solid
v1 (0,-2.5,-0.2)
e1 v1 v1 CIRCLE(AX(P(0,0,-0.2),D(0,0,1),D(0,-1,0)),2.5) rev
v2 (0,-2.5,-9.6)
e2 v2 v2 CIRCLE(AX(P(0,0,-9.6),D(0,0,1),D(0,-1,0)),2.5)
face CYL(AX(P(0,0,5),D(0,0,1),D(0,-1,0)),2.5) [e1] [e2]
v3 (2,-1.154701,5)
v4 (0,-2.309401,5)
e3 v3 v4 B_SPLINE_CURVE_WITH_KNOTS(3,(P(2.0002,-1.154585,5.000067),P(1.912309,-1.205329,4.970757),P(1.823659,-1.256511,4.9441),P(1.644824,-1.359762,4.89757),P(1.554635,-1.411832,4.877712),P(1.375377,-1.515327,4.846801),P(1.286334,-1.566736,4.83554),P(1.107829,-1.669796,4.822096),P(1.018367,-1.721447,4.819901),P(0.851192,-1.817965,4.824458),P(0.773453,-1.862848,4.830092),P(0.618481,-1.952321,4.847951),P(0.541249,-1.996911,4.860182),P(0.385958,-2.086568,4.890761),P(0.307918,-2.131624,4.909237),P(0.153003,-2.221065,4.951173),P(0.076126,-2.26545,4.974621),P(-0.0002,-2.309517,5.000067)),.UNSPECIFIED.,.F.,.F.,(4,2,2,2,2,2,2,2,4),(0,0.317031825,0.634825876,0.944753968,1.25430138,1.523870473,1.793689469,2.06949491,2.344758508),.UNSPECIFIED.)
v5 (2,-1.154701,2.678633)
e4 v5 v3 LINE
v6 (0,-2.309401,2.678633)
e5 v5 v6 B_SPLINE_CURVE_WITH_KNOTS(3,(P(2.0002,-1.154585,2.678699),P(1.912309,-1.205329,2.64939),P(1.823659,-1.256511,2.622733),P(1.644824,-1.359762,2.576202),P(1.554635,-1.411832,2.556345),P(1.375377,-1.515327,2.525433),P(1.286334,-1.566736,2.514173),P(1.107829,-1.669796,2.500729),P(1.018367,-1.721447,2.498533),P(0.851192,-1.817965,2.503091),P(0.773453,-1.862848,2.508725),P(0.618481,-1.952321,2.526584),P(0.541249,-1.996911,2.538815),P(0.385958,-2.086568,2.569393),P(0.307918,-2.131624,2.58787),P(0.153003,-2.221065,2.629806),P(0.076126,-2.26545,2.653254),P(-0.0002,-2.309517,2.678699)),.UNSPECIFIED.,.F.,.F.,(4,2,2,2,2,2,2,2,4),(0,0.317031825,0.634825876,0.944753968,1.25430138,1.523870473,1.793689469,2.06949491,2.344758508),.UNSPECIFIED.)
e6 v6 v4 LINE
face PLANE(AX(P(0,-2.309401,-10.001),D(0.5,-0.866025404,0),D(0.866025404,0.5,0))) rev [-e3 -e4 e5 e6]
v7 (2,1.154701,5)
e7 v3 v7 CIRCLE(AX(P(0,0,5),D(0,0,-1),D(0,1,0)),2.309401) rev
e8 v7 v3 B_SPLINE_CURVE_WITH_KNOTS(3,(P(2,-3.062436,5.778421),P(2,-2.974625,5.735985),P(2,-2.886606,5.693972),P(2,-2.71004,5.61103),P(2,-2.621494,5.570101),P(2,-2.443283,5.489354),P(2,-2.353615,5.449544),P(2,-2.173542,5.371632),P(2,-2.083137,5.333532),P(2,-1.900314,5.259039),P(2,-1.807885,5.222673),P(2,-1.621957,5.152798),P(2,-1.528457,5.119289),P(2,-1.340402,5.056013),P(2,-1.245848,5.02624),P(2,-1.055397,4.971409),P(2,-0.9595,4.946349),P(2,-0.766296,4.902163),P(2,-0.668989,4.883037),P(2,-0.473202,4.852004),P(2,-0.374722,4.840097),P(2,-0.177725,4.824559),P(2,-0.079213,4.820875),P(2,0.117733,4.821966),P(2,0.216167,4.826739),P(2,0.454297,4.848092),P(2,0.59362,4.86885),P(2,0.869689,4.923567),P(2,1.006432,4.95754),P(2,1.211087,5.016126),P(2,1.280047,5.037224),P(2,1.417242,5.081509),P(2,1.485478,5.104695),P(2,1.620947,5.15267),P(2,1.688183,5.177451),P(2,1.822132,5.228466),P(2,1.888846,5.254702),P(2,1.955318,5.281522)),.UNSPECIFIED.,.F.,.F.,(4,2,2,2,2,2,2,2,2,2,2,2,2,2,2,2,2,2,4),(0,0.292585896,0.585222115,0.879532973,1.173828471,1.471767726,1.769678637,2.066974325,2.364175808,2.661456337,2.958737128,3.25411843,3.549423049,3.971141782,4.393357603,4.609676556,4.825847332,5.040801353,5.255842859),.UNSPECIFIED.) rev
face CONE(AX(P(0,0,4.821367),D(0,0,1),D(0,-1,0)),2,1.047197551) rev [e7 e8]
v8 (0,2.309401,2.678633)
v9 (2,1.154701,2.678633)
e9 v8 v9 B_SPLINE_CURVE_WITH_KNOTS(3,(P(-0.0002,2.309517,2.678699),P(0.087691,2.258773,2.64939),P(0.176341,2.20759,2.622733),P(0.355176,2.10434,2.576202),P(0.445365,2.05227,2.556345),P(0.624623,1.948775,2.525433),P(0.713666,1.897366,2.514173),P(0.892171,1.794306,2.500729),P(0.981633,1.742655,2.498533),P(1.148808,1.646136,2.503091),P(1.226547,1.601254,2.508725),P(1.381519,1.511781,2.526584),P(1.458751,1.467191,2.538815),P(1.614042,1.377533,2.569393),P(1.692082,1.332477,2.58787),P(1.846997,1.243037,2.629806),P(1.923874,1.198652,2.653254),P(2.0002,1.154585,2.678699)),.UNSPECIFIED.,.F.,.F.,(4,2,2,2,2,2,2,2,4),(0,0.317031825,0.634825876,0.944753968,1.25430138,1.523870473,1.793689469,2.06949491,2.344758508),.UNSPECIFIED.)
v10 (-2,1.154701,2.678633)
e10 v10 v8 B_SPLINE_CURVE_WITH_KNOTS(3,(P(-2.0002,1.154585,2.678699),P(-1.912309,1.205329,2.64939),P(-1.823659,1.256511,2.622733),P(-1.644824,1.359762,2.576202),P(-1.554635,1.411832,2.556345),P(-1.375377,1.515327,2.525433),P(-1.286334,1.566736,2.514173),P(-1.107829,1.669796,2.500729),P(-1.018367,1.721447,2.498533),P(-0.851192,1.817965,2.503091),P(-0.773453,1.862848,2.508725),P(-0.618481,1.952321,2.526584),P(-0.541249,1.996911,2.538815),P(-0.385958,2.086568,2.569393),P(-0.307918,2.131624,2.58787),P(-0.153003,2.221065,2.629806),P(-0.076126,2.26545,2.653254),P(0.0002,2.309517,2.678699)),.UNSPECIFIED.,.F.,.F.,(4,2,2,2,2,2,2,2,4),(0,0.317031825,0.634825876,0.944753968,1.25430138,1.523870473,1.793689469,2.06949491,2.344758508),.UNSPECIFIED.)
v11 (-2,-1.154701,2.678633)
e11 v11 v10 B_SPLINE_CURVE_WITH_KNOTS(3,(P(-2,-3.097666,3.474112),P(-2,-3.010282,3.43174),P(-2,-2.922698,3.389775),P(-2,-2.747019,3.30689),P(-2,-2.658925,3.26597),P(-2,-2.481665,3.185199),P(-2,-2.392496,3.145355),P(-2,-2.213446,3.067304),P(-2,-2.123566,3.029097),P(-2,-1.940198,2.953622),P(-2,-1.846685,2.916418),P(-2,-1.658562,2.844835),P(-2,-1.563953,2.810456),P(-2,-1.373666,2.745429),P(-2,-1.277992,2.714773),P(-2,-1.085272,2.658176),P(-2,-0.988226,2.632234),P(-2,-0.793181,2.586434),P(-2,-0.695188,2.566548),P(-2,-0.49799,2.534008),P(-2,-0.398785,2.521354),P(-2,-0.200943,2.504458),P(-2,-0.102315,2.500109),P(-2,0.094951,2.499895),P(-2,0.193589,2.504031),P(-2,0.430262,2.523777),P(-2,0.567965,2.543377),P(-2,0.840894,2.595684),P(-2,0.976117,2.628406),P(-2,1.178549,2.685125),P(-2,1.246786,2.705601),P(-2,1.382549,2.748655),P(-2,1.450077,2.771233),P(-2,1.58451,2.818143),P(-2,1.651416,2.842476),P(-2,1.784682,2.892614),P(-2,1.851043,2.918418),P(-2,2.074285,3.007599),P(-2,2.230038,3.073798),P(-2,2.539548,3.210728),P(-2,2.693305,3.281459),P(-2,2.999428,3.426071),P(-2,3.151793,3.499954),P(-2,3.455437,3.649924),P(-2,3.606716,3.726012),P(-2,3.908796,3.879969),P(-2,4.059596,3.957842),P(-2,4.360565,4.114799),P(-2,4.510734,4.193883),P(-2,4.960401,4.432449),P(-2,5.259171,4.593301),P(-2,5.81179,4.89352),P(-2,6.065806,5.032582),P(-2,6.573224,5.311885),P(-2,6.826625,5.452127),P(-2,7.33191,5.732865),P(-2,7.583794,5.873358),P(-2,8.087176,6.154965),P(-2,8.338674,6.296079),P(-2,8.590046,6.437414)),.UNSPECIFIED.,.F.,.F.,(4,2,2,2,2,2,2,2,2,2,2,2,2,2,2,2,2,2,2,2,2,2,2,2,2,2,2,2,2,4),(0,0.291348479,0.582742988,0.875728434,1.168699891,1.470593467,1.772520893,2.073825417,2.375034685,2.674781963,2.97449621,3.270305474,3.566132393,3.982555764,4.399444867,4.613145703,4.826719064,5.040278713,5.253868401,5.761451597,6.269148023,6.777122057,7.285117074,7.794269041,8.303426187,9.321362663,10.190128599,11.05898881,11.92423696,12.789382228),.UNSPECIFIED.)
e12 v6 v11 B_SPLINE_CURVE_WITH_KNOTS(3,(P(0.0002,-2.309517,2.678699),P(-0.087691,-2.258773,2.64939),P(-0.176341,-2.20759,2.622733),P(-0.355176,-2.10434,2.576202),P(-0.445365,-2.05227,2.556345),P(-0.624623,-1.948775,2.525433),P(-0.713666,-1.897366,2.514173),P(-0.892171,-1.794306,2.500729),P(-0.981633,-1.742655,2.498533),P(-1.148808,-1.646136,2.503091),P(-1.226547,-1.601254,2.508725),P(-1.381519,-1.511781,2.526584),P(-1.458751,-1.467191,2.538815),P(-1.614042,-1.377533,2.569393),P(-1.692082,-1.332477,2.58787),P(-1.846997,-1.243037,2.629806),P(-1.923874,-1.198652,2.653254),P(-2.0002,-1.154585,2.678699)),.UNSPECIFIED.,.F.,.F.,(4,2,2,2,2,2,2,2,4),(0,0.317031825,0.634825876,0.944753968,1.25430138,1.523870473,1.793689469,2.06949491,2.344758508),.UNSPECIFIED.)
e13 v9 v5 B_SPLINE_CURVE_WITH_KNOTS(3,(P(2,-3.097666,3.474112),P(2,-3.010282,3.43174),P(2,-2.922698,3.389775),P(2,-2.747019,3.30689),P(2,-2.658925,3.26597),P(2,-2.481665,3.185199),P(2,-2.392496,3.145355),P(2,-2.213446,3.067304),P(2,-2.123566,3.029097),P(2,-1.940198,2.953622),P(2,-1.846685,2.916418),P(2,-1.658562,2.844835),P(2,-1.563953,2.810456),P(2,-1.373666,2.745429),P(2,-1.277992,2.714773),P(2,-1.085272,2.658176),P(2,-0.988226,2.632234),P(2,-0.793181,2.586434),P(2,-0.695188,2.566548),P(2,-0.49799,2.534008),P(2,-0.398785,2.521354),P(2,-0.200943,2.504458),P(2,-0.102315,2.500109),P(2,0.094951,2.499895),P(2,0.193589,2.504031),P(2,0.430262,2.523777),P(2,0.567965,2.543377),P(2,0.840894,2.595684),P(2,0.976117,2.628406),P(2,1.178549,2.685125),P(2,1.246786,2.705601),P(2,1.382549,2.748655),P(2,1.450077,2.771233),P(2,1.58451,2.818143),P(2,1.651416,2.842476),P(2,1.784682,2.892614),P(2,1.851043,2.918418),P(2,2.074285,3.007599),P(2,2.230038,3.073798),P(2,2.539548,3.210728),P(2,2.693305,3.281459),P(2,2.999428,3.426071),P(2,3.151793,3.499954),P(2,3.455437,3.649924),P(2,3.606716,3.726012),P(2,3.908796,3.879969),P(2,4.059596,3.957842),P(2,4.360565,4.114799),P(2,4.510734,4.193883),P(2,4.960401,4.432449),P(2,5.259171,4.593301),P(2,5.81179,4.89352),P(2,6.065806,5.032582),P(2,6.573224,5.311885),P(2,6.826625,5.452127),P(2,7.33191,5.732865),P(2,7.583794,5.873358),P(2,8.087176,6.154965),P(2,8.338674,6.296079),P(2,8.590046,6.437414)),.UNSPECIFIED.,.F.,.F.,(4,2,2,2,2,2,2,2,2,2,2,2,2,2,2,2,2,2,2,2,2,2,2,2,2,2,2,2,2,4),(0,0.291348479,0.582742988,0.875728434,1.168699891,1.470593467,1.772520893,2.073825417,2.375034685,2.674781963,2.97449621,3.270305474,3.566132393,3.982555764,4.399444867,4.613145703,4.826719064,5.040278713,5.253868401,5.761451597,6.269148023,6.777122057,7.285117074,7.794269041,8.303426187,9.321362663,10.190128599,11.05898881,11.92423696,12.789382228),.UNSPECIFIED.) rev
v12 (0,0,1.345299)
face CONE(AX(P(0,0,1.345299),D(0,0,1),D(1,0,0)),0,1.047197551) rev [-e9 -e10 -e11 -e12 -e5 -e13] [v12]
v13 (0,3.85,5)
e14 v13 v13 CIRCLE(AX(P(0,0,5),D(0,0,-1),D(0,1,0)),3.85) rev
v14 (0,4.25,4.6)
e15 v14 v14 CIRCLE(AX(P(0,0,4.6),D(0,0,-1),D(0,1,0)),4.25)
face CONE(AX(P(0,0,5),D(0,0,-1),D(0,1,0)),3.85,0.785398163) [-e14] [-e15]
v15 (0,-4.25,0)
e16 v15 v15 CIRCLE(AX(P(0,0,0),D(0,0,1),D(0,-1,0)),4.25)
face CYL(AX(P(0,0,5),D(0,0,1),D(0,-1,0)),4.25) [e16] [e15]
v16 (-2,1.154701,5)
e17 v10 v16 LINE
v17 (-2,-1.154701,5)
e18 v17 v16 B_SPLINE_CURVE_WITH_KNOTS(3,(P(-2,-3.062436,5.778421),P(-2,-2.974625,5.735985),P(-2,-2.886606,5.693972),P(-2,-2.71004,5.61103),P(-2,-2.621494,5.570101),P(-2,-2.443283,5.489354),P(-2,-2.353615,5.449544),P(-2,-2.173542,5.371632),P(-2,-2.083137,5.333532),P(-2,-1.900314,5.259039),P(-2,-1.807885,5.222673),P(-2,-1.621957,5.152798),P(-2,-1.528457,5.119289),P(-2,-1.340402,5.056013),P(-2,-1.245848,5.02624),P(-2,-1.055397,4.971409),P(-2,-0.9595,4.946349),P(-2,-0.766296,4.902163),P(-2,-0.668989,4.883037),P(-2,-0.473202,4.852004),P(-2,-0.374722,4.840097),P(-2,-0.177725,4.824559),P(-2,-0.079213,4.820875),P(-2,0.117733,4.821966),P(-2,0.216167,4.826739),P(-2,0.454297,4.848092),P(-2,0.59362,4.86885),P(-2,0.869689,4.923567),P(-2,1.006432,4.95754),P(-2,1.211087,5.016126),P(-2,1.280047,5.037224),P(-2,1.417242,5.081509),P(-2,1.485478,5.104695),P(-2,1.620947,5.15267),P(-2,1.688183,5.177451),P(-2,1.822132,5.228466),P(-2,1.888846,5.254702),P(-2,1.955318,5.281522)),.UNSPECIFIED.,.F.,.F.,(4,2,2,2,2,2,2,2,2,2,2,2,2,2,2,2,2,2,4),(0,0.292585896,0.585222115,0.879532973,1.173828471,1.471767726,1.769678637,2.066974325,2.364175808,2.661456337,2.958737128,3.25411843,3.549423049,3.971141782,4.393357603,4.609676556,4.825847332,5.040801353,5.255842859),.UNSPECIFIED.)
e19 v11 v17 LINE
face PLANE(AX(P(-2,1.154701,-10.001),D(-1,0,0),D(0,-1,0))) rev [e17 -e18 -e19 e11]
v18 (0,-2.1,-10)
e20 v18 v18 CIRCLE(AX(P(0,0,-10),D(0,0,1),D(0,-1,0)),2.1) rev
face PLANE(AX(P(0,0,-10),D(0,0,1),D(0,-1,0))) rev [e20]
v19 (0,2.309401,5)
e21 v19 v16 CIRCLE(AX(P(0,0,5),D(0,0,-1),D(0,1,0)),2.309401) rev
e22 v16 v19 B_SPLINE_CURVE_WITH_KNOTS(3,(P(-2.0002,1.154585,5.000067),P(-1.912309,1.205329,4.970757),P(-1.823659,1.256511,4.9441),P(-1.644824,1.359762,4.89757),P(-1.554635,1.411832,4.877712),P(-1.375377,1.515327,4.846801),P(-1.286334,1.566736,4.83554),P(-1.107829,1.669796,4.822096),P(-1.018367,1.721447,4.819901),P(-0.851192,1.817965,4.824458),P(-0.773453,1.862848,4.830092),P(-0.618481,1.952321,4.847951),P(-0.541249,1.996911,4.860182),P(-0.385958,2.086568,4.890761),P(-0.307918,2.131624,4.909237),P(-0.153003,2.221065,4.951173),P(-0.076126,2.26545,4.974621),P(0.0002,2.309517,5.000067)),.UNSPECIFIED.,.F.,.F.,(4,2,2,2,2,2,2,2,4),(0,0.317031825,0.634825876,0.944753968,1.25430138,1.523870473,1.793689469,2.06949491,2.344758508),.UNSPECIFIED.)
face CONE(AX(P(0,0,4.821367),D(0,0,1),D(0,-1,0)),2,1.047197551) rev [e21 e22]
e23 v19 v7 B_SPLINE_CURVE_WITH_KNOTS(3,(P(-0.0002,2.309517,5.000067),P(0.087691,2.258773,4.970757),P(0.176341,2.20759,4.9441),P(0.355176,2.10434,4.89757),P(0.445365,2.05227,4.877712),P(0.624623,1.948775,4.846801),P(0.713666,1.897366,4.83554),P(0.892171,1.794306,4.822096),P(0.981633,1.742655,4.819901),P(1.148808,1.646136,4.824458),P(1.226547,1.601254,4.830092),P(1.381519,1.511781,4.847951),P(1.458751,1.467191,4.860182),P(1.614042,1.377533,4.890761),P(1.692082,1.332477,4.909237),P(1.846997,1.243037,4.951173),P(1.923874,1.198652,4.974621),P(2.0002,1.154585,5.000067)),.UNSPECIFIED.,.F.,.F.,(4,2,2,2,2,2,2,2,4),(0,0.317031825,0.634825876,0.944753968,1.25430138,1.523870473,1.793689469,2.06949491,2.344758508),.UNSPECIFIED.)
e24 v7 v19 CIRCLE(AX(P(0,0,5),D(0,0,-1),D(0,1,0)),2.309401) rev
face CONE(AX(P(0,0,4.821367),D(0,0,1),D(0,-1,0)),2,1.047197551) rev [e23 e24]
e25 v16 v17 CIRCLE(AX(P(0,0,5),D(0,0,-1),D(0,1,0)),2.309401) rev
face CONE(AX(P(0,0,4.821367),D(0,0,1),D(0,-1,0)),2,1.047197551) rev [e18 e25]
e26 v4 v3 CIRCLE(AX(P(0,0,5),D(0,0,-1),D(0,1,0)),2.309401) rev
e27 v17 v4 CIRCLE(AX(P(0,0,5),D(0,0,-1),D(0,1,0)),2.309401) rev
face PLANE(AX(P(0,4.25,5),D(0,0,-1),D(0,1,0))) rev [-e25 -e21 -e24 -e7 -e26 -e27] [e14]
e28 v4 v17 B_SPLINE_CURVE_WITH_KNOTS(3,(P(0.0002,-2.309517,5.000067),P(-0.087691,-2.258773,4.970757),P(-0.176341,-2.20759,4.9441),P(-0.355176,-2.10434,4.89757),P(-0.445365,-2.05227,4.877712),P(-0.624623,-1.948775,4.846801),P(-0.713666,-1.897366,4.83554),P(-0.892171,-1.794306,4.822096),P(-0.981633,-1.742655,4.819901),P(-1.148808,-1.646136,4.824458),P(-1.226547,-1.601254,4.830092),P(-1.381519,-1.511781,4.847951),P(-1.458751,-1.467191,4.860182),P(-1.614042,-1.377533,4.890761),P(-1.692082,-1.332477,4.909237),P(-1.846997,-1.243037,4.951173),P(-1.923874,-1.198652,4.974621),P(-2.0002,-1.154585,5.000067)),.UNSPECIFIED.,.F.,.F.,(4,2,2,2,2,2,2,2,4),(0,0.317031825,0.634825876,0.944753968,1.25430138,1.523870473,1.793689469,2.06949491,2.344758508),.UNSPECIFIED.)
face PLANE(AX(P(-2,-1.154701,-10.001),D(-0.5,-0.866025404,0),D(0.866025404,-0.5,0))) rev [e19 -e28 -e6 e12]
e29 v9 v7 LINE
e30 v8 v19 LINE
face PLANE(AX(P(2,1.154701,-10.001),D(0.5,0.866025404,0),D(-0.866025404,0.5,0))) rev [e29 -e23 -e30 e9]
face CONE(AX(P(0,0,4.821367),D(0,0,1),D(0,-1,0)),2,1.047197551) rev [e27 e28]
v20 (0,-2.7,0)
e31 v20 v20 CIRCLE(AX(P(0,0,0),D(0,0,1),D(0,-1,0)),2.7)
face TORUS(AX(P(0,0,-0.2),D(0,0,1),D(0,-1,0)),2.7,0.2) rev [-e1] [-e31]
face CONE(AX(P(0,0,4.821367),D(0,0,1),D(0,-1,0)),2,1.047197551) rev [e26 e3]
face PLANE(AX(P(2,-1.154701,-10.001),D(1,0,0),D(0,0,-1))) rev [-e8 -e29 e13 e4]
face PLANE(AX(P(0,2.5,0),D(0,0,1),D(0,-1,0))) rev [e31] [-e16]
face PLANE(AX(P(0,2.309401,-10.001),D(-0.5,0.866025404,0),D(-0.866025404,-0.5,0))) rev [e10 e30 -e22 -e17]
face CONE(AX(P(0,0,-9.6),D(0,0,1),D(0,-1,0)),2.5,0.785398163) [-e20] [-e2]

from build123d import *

# Parameters (mm, degrees)
CHAMFER1_SIZE      = 0.4
CUT_EXTRUDE1_REACH = 18.159
FILLET2_R          = 0.2


with BuildPart() as part:
    # Sketch1 → Revolve1 (revolve)
    with BuildSketch(Plane(origin=(0, 0, 0), x_dir=(0, 0, -1), z_dir=(1, 0, 0))):
        Polygon((0, 4.25), (-5, 4.25), (-5, 0), (10, 0), (10, 2.5), (0, 2.5), align=None)
    revolve(axis=Axis((0, 0, 5), (0, 0, -1)))

    # Sketch7 → Cut-Revolve2 (revolve, cut)
    with BuildSketch(Plane(origin=(0, 0, 0), x_dir=(0, 0, -1), z_dir=(1, 0, 0))):
        Polygon((-5, 0), (-5, 2), (-2.5, 2), (-1.345299462, 0), align=None)
    revolve(axis=Axis((0, 0, 5), (0, 0, -1)), mode=Mode.SUBTRACT)

    # Chamfer1
    chamfer1_edges = [part.edges().sort_by_distance(p)[0] for p in [
        (0, -2.5, -10),
        (0, -4.25, 5),
    ]]
    chamfer(chamfer1_edges, length=CHAMFER1_SIZE)

    # Cut-Extrude1: up to this cone (the profile starts inside it)
    cut_extrude1_end = Plane(origin=(0, 0, 5), z_dir=(0, 0, 1)).offset(-3.654699538) * Cone(1.732e-06, 49.612564652, 28.643826557, align=(Align.CENTER, Align.CENTER, Align.MIN), mode=Mode.PRIVATE)
    # Sketch8 → Cut-Extrude1 (cut, up to the surface)
    with BuildSketch(Plane.XY.offset(5), mode=Mode.PRIVATE) as cut_extrude1_sk1:
        Polygon((0, 2.309401077), (-2, 1.154700538), (-2, -1.154700538), (0, -2.309401077), (2, -1.154700538), (2, 1.154700538), align=None)
    cut_extrude1_tool1 = extrude(cut_extrude1_sk1.sketch, amount=-CUT_EXTRUDE1_REACH, mode=Mode.PRIVATE) & cut_extrude1_end
    add(cut_extrude1_tool1.solids().sort_by_distance((0, 0, 5))[0], mode=Mode.SUBTRACT)

    # Sketch9 → Cut-Revolve3 (revolve, cut)
    with BuildSketch(Plane(origin=(0, 0, 0), x_dir=(0, 0, -1), z_dir=(1, 0, 0))):
        Polygon((-5.5, 3.175426481), (-5.5, 2), (-4.821367205, 2), align=None)
    revolve(axis=Axis((0, 0, 5), (0, 0, -1)), mode=Mode.SUBTRACT)

    # Fillet2
    fillet2_edges = [part.edges().sort_by_distance(p)[0] for p in [
        (0, -2.5, 0),
    ]]
    fillet(fillet2_edges, radius=FILLET2_R)


solid = part.part
